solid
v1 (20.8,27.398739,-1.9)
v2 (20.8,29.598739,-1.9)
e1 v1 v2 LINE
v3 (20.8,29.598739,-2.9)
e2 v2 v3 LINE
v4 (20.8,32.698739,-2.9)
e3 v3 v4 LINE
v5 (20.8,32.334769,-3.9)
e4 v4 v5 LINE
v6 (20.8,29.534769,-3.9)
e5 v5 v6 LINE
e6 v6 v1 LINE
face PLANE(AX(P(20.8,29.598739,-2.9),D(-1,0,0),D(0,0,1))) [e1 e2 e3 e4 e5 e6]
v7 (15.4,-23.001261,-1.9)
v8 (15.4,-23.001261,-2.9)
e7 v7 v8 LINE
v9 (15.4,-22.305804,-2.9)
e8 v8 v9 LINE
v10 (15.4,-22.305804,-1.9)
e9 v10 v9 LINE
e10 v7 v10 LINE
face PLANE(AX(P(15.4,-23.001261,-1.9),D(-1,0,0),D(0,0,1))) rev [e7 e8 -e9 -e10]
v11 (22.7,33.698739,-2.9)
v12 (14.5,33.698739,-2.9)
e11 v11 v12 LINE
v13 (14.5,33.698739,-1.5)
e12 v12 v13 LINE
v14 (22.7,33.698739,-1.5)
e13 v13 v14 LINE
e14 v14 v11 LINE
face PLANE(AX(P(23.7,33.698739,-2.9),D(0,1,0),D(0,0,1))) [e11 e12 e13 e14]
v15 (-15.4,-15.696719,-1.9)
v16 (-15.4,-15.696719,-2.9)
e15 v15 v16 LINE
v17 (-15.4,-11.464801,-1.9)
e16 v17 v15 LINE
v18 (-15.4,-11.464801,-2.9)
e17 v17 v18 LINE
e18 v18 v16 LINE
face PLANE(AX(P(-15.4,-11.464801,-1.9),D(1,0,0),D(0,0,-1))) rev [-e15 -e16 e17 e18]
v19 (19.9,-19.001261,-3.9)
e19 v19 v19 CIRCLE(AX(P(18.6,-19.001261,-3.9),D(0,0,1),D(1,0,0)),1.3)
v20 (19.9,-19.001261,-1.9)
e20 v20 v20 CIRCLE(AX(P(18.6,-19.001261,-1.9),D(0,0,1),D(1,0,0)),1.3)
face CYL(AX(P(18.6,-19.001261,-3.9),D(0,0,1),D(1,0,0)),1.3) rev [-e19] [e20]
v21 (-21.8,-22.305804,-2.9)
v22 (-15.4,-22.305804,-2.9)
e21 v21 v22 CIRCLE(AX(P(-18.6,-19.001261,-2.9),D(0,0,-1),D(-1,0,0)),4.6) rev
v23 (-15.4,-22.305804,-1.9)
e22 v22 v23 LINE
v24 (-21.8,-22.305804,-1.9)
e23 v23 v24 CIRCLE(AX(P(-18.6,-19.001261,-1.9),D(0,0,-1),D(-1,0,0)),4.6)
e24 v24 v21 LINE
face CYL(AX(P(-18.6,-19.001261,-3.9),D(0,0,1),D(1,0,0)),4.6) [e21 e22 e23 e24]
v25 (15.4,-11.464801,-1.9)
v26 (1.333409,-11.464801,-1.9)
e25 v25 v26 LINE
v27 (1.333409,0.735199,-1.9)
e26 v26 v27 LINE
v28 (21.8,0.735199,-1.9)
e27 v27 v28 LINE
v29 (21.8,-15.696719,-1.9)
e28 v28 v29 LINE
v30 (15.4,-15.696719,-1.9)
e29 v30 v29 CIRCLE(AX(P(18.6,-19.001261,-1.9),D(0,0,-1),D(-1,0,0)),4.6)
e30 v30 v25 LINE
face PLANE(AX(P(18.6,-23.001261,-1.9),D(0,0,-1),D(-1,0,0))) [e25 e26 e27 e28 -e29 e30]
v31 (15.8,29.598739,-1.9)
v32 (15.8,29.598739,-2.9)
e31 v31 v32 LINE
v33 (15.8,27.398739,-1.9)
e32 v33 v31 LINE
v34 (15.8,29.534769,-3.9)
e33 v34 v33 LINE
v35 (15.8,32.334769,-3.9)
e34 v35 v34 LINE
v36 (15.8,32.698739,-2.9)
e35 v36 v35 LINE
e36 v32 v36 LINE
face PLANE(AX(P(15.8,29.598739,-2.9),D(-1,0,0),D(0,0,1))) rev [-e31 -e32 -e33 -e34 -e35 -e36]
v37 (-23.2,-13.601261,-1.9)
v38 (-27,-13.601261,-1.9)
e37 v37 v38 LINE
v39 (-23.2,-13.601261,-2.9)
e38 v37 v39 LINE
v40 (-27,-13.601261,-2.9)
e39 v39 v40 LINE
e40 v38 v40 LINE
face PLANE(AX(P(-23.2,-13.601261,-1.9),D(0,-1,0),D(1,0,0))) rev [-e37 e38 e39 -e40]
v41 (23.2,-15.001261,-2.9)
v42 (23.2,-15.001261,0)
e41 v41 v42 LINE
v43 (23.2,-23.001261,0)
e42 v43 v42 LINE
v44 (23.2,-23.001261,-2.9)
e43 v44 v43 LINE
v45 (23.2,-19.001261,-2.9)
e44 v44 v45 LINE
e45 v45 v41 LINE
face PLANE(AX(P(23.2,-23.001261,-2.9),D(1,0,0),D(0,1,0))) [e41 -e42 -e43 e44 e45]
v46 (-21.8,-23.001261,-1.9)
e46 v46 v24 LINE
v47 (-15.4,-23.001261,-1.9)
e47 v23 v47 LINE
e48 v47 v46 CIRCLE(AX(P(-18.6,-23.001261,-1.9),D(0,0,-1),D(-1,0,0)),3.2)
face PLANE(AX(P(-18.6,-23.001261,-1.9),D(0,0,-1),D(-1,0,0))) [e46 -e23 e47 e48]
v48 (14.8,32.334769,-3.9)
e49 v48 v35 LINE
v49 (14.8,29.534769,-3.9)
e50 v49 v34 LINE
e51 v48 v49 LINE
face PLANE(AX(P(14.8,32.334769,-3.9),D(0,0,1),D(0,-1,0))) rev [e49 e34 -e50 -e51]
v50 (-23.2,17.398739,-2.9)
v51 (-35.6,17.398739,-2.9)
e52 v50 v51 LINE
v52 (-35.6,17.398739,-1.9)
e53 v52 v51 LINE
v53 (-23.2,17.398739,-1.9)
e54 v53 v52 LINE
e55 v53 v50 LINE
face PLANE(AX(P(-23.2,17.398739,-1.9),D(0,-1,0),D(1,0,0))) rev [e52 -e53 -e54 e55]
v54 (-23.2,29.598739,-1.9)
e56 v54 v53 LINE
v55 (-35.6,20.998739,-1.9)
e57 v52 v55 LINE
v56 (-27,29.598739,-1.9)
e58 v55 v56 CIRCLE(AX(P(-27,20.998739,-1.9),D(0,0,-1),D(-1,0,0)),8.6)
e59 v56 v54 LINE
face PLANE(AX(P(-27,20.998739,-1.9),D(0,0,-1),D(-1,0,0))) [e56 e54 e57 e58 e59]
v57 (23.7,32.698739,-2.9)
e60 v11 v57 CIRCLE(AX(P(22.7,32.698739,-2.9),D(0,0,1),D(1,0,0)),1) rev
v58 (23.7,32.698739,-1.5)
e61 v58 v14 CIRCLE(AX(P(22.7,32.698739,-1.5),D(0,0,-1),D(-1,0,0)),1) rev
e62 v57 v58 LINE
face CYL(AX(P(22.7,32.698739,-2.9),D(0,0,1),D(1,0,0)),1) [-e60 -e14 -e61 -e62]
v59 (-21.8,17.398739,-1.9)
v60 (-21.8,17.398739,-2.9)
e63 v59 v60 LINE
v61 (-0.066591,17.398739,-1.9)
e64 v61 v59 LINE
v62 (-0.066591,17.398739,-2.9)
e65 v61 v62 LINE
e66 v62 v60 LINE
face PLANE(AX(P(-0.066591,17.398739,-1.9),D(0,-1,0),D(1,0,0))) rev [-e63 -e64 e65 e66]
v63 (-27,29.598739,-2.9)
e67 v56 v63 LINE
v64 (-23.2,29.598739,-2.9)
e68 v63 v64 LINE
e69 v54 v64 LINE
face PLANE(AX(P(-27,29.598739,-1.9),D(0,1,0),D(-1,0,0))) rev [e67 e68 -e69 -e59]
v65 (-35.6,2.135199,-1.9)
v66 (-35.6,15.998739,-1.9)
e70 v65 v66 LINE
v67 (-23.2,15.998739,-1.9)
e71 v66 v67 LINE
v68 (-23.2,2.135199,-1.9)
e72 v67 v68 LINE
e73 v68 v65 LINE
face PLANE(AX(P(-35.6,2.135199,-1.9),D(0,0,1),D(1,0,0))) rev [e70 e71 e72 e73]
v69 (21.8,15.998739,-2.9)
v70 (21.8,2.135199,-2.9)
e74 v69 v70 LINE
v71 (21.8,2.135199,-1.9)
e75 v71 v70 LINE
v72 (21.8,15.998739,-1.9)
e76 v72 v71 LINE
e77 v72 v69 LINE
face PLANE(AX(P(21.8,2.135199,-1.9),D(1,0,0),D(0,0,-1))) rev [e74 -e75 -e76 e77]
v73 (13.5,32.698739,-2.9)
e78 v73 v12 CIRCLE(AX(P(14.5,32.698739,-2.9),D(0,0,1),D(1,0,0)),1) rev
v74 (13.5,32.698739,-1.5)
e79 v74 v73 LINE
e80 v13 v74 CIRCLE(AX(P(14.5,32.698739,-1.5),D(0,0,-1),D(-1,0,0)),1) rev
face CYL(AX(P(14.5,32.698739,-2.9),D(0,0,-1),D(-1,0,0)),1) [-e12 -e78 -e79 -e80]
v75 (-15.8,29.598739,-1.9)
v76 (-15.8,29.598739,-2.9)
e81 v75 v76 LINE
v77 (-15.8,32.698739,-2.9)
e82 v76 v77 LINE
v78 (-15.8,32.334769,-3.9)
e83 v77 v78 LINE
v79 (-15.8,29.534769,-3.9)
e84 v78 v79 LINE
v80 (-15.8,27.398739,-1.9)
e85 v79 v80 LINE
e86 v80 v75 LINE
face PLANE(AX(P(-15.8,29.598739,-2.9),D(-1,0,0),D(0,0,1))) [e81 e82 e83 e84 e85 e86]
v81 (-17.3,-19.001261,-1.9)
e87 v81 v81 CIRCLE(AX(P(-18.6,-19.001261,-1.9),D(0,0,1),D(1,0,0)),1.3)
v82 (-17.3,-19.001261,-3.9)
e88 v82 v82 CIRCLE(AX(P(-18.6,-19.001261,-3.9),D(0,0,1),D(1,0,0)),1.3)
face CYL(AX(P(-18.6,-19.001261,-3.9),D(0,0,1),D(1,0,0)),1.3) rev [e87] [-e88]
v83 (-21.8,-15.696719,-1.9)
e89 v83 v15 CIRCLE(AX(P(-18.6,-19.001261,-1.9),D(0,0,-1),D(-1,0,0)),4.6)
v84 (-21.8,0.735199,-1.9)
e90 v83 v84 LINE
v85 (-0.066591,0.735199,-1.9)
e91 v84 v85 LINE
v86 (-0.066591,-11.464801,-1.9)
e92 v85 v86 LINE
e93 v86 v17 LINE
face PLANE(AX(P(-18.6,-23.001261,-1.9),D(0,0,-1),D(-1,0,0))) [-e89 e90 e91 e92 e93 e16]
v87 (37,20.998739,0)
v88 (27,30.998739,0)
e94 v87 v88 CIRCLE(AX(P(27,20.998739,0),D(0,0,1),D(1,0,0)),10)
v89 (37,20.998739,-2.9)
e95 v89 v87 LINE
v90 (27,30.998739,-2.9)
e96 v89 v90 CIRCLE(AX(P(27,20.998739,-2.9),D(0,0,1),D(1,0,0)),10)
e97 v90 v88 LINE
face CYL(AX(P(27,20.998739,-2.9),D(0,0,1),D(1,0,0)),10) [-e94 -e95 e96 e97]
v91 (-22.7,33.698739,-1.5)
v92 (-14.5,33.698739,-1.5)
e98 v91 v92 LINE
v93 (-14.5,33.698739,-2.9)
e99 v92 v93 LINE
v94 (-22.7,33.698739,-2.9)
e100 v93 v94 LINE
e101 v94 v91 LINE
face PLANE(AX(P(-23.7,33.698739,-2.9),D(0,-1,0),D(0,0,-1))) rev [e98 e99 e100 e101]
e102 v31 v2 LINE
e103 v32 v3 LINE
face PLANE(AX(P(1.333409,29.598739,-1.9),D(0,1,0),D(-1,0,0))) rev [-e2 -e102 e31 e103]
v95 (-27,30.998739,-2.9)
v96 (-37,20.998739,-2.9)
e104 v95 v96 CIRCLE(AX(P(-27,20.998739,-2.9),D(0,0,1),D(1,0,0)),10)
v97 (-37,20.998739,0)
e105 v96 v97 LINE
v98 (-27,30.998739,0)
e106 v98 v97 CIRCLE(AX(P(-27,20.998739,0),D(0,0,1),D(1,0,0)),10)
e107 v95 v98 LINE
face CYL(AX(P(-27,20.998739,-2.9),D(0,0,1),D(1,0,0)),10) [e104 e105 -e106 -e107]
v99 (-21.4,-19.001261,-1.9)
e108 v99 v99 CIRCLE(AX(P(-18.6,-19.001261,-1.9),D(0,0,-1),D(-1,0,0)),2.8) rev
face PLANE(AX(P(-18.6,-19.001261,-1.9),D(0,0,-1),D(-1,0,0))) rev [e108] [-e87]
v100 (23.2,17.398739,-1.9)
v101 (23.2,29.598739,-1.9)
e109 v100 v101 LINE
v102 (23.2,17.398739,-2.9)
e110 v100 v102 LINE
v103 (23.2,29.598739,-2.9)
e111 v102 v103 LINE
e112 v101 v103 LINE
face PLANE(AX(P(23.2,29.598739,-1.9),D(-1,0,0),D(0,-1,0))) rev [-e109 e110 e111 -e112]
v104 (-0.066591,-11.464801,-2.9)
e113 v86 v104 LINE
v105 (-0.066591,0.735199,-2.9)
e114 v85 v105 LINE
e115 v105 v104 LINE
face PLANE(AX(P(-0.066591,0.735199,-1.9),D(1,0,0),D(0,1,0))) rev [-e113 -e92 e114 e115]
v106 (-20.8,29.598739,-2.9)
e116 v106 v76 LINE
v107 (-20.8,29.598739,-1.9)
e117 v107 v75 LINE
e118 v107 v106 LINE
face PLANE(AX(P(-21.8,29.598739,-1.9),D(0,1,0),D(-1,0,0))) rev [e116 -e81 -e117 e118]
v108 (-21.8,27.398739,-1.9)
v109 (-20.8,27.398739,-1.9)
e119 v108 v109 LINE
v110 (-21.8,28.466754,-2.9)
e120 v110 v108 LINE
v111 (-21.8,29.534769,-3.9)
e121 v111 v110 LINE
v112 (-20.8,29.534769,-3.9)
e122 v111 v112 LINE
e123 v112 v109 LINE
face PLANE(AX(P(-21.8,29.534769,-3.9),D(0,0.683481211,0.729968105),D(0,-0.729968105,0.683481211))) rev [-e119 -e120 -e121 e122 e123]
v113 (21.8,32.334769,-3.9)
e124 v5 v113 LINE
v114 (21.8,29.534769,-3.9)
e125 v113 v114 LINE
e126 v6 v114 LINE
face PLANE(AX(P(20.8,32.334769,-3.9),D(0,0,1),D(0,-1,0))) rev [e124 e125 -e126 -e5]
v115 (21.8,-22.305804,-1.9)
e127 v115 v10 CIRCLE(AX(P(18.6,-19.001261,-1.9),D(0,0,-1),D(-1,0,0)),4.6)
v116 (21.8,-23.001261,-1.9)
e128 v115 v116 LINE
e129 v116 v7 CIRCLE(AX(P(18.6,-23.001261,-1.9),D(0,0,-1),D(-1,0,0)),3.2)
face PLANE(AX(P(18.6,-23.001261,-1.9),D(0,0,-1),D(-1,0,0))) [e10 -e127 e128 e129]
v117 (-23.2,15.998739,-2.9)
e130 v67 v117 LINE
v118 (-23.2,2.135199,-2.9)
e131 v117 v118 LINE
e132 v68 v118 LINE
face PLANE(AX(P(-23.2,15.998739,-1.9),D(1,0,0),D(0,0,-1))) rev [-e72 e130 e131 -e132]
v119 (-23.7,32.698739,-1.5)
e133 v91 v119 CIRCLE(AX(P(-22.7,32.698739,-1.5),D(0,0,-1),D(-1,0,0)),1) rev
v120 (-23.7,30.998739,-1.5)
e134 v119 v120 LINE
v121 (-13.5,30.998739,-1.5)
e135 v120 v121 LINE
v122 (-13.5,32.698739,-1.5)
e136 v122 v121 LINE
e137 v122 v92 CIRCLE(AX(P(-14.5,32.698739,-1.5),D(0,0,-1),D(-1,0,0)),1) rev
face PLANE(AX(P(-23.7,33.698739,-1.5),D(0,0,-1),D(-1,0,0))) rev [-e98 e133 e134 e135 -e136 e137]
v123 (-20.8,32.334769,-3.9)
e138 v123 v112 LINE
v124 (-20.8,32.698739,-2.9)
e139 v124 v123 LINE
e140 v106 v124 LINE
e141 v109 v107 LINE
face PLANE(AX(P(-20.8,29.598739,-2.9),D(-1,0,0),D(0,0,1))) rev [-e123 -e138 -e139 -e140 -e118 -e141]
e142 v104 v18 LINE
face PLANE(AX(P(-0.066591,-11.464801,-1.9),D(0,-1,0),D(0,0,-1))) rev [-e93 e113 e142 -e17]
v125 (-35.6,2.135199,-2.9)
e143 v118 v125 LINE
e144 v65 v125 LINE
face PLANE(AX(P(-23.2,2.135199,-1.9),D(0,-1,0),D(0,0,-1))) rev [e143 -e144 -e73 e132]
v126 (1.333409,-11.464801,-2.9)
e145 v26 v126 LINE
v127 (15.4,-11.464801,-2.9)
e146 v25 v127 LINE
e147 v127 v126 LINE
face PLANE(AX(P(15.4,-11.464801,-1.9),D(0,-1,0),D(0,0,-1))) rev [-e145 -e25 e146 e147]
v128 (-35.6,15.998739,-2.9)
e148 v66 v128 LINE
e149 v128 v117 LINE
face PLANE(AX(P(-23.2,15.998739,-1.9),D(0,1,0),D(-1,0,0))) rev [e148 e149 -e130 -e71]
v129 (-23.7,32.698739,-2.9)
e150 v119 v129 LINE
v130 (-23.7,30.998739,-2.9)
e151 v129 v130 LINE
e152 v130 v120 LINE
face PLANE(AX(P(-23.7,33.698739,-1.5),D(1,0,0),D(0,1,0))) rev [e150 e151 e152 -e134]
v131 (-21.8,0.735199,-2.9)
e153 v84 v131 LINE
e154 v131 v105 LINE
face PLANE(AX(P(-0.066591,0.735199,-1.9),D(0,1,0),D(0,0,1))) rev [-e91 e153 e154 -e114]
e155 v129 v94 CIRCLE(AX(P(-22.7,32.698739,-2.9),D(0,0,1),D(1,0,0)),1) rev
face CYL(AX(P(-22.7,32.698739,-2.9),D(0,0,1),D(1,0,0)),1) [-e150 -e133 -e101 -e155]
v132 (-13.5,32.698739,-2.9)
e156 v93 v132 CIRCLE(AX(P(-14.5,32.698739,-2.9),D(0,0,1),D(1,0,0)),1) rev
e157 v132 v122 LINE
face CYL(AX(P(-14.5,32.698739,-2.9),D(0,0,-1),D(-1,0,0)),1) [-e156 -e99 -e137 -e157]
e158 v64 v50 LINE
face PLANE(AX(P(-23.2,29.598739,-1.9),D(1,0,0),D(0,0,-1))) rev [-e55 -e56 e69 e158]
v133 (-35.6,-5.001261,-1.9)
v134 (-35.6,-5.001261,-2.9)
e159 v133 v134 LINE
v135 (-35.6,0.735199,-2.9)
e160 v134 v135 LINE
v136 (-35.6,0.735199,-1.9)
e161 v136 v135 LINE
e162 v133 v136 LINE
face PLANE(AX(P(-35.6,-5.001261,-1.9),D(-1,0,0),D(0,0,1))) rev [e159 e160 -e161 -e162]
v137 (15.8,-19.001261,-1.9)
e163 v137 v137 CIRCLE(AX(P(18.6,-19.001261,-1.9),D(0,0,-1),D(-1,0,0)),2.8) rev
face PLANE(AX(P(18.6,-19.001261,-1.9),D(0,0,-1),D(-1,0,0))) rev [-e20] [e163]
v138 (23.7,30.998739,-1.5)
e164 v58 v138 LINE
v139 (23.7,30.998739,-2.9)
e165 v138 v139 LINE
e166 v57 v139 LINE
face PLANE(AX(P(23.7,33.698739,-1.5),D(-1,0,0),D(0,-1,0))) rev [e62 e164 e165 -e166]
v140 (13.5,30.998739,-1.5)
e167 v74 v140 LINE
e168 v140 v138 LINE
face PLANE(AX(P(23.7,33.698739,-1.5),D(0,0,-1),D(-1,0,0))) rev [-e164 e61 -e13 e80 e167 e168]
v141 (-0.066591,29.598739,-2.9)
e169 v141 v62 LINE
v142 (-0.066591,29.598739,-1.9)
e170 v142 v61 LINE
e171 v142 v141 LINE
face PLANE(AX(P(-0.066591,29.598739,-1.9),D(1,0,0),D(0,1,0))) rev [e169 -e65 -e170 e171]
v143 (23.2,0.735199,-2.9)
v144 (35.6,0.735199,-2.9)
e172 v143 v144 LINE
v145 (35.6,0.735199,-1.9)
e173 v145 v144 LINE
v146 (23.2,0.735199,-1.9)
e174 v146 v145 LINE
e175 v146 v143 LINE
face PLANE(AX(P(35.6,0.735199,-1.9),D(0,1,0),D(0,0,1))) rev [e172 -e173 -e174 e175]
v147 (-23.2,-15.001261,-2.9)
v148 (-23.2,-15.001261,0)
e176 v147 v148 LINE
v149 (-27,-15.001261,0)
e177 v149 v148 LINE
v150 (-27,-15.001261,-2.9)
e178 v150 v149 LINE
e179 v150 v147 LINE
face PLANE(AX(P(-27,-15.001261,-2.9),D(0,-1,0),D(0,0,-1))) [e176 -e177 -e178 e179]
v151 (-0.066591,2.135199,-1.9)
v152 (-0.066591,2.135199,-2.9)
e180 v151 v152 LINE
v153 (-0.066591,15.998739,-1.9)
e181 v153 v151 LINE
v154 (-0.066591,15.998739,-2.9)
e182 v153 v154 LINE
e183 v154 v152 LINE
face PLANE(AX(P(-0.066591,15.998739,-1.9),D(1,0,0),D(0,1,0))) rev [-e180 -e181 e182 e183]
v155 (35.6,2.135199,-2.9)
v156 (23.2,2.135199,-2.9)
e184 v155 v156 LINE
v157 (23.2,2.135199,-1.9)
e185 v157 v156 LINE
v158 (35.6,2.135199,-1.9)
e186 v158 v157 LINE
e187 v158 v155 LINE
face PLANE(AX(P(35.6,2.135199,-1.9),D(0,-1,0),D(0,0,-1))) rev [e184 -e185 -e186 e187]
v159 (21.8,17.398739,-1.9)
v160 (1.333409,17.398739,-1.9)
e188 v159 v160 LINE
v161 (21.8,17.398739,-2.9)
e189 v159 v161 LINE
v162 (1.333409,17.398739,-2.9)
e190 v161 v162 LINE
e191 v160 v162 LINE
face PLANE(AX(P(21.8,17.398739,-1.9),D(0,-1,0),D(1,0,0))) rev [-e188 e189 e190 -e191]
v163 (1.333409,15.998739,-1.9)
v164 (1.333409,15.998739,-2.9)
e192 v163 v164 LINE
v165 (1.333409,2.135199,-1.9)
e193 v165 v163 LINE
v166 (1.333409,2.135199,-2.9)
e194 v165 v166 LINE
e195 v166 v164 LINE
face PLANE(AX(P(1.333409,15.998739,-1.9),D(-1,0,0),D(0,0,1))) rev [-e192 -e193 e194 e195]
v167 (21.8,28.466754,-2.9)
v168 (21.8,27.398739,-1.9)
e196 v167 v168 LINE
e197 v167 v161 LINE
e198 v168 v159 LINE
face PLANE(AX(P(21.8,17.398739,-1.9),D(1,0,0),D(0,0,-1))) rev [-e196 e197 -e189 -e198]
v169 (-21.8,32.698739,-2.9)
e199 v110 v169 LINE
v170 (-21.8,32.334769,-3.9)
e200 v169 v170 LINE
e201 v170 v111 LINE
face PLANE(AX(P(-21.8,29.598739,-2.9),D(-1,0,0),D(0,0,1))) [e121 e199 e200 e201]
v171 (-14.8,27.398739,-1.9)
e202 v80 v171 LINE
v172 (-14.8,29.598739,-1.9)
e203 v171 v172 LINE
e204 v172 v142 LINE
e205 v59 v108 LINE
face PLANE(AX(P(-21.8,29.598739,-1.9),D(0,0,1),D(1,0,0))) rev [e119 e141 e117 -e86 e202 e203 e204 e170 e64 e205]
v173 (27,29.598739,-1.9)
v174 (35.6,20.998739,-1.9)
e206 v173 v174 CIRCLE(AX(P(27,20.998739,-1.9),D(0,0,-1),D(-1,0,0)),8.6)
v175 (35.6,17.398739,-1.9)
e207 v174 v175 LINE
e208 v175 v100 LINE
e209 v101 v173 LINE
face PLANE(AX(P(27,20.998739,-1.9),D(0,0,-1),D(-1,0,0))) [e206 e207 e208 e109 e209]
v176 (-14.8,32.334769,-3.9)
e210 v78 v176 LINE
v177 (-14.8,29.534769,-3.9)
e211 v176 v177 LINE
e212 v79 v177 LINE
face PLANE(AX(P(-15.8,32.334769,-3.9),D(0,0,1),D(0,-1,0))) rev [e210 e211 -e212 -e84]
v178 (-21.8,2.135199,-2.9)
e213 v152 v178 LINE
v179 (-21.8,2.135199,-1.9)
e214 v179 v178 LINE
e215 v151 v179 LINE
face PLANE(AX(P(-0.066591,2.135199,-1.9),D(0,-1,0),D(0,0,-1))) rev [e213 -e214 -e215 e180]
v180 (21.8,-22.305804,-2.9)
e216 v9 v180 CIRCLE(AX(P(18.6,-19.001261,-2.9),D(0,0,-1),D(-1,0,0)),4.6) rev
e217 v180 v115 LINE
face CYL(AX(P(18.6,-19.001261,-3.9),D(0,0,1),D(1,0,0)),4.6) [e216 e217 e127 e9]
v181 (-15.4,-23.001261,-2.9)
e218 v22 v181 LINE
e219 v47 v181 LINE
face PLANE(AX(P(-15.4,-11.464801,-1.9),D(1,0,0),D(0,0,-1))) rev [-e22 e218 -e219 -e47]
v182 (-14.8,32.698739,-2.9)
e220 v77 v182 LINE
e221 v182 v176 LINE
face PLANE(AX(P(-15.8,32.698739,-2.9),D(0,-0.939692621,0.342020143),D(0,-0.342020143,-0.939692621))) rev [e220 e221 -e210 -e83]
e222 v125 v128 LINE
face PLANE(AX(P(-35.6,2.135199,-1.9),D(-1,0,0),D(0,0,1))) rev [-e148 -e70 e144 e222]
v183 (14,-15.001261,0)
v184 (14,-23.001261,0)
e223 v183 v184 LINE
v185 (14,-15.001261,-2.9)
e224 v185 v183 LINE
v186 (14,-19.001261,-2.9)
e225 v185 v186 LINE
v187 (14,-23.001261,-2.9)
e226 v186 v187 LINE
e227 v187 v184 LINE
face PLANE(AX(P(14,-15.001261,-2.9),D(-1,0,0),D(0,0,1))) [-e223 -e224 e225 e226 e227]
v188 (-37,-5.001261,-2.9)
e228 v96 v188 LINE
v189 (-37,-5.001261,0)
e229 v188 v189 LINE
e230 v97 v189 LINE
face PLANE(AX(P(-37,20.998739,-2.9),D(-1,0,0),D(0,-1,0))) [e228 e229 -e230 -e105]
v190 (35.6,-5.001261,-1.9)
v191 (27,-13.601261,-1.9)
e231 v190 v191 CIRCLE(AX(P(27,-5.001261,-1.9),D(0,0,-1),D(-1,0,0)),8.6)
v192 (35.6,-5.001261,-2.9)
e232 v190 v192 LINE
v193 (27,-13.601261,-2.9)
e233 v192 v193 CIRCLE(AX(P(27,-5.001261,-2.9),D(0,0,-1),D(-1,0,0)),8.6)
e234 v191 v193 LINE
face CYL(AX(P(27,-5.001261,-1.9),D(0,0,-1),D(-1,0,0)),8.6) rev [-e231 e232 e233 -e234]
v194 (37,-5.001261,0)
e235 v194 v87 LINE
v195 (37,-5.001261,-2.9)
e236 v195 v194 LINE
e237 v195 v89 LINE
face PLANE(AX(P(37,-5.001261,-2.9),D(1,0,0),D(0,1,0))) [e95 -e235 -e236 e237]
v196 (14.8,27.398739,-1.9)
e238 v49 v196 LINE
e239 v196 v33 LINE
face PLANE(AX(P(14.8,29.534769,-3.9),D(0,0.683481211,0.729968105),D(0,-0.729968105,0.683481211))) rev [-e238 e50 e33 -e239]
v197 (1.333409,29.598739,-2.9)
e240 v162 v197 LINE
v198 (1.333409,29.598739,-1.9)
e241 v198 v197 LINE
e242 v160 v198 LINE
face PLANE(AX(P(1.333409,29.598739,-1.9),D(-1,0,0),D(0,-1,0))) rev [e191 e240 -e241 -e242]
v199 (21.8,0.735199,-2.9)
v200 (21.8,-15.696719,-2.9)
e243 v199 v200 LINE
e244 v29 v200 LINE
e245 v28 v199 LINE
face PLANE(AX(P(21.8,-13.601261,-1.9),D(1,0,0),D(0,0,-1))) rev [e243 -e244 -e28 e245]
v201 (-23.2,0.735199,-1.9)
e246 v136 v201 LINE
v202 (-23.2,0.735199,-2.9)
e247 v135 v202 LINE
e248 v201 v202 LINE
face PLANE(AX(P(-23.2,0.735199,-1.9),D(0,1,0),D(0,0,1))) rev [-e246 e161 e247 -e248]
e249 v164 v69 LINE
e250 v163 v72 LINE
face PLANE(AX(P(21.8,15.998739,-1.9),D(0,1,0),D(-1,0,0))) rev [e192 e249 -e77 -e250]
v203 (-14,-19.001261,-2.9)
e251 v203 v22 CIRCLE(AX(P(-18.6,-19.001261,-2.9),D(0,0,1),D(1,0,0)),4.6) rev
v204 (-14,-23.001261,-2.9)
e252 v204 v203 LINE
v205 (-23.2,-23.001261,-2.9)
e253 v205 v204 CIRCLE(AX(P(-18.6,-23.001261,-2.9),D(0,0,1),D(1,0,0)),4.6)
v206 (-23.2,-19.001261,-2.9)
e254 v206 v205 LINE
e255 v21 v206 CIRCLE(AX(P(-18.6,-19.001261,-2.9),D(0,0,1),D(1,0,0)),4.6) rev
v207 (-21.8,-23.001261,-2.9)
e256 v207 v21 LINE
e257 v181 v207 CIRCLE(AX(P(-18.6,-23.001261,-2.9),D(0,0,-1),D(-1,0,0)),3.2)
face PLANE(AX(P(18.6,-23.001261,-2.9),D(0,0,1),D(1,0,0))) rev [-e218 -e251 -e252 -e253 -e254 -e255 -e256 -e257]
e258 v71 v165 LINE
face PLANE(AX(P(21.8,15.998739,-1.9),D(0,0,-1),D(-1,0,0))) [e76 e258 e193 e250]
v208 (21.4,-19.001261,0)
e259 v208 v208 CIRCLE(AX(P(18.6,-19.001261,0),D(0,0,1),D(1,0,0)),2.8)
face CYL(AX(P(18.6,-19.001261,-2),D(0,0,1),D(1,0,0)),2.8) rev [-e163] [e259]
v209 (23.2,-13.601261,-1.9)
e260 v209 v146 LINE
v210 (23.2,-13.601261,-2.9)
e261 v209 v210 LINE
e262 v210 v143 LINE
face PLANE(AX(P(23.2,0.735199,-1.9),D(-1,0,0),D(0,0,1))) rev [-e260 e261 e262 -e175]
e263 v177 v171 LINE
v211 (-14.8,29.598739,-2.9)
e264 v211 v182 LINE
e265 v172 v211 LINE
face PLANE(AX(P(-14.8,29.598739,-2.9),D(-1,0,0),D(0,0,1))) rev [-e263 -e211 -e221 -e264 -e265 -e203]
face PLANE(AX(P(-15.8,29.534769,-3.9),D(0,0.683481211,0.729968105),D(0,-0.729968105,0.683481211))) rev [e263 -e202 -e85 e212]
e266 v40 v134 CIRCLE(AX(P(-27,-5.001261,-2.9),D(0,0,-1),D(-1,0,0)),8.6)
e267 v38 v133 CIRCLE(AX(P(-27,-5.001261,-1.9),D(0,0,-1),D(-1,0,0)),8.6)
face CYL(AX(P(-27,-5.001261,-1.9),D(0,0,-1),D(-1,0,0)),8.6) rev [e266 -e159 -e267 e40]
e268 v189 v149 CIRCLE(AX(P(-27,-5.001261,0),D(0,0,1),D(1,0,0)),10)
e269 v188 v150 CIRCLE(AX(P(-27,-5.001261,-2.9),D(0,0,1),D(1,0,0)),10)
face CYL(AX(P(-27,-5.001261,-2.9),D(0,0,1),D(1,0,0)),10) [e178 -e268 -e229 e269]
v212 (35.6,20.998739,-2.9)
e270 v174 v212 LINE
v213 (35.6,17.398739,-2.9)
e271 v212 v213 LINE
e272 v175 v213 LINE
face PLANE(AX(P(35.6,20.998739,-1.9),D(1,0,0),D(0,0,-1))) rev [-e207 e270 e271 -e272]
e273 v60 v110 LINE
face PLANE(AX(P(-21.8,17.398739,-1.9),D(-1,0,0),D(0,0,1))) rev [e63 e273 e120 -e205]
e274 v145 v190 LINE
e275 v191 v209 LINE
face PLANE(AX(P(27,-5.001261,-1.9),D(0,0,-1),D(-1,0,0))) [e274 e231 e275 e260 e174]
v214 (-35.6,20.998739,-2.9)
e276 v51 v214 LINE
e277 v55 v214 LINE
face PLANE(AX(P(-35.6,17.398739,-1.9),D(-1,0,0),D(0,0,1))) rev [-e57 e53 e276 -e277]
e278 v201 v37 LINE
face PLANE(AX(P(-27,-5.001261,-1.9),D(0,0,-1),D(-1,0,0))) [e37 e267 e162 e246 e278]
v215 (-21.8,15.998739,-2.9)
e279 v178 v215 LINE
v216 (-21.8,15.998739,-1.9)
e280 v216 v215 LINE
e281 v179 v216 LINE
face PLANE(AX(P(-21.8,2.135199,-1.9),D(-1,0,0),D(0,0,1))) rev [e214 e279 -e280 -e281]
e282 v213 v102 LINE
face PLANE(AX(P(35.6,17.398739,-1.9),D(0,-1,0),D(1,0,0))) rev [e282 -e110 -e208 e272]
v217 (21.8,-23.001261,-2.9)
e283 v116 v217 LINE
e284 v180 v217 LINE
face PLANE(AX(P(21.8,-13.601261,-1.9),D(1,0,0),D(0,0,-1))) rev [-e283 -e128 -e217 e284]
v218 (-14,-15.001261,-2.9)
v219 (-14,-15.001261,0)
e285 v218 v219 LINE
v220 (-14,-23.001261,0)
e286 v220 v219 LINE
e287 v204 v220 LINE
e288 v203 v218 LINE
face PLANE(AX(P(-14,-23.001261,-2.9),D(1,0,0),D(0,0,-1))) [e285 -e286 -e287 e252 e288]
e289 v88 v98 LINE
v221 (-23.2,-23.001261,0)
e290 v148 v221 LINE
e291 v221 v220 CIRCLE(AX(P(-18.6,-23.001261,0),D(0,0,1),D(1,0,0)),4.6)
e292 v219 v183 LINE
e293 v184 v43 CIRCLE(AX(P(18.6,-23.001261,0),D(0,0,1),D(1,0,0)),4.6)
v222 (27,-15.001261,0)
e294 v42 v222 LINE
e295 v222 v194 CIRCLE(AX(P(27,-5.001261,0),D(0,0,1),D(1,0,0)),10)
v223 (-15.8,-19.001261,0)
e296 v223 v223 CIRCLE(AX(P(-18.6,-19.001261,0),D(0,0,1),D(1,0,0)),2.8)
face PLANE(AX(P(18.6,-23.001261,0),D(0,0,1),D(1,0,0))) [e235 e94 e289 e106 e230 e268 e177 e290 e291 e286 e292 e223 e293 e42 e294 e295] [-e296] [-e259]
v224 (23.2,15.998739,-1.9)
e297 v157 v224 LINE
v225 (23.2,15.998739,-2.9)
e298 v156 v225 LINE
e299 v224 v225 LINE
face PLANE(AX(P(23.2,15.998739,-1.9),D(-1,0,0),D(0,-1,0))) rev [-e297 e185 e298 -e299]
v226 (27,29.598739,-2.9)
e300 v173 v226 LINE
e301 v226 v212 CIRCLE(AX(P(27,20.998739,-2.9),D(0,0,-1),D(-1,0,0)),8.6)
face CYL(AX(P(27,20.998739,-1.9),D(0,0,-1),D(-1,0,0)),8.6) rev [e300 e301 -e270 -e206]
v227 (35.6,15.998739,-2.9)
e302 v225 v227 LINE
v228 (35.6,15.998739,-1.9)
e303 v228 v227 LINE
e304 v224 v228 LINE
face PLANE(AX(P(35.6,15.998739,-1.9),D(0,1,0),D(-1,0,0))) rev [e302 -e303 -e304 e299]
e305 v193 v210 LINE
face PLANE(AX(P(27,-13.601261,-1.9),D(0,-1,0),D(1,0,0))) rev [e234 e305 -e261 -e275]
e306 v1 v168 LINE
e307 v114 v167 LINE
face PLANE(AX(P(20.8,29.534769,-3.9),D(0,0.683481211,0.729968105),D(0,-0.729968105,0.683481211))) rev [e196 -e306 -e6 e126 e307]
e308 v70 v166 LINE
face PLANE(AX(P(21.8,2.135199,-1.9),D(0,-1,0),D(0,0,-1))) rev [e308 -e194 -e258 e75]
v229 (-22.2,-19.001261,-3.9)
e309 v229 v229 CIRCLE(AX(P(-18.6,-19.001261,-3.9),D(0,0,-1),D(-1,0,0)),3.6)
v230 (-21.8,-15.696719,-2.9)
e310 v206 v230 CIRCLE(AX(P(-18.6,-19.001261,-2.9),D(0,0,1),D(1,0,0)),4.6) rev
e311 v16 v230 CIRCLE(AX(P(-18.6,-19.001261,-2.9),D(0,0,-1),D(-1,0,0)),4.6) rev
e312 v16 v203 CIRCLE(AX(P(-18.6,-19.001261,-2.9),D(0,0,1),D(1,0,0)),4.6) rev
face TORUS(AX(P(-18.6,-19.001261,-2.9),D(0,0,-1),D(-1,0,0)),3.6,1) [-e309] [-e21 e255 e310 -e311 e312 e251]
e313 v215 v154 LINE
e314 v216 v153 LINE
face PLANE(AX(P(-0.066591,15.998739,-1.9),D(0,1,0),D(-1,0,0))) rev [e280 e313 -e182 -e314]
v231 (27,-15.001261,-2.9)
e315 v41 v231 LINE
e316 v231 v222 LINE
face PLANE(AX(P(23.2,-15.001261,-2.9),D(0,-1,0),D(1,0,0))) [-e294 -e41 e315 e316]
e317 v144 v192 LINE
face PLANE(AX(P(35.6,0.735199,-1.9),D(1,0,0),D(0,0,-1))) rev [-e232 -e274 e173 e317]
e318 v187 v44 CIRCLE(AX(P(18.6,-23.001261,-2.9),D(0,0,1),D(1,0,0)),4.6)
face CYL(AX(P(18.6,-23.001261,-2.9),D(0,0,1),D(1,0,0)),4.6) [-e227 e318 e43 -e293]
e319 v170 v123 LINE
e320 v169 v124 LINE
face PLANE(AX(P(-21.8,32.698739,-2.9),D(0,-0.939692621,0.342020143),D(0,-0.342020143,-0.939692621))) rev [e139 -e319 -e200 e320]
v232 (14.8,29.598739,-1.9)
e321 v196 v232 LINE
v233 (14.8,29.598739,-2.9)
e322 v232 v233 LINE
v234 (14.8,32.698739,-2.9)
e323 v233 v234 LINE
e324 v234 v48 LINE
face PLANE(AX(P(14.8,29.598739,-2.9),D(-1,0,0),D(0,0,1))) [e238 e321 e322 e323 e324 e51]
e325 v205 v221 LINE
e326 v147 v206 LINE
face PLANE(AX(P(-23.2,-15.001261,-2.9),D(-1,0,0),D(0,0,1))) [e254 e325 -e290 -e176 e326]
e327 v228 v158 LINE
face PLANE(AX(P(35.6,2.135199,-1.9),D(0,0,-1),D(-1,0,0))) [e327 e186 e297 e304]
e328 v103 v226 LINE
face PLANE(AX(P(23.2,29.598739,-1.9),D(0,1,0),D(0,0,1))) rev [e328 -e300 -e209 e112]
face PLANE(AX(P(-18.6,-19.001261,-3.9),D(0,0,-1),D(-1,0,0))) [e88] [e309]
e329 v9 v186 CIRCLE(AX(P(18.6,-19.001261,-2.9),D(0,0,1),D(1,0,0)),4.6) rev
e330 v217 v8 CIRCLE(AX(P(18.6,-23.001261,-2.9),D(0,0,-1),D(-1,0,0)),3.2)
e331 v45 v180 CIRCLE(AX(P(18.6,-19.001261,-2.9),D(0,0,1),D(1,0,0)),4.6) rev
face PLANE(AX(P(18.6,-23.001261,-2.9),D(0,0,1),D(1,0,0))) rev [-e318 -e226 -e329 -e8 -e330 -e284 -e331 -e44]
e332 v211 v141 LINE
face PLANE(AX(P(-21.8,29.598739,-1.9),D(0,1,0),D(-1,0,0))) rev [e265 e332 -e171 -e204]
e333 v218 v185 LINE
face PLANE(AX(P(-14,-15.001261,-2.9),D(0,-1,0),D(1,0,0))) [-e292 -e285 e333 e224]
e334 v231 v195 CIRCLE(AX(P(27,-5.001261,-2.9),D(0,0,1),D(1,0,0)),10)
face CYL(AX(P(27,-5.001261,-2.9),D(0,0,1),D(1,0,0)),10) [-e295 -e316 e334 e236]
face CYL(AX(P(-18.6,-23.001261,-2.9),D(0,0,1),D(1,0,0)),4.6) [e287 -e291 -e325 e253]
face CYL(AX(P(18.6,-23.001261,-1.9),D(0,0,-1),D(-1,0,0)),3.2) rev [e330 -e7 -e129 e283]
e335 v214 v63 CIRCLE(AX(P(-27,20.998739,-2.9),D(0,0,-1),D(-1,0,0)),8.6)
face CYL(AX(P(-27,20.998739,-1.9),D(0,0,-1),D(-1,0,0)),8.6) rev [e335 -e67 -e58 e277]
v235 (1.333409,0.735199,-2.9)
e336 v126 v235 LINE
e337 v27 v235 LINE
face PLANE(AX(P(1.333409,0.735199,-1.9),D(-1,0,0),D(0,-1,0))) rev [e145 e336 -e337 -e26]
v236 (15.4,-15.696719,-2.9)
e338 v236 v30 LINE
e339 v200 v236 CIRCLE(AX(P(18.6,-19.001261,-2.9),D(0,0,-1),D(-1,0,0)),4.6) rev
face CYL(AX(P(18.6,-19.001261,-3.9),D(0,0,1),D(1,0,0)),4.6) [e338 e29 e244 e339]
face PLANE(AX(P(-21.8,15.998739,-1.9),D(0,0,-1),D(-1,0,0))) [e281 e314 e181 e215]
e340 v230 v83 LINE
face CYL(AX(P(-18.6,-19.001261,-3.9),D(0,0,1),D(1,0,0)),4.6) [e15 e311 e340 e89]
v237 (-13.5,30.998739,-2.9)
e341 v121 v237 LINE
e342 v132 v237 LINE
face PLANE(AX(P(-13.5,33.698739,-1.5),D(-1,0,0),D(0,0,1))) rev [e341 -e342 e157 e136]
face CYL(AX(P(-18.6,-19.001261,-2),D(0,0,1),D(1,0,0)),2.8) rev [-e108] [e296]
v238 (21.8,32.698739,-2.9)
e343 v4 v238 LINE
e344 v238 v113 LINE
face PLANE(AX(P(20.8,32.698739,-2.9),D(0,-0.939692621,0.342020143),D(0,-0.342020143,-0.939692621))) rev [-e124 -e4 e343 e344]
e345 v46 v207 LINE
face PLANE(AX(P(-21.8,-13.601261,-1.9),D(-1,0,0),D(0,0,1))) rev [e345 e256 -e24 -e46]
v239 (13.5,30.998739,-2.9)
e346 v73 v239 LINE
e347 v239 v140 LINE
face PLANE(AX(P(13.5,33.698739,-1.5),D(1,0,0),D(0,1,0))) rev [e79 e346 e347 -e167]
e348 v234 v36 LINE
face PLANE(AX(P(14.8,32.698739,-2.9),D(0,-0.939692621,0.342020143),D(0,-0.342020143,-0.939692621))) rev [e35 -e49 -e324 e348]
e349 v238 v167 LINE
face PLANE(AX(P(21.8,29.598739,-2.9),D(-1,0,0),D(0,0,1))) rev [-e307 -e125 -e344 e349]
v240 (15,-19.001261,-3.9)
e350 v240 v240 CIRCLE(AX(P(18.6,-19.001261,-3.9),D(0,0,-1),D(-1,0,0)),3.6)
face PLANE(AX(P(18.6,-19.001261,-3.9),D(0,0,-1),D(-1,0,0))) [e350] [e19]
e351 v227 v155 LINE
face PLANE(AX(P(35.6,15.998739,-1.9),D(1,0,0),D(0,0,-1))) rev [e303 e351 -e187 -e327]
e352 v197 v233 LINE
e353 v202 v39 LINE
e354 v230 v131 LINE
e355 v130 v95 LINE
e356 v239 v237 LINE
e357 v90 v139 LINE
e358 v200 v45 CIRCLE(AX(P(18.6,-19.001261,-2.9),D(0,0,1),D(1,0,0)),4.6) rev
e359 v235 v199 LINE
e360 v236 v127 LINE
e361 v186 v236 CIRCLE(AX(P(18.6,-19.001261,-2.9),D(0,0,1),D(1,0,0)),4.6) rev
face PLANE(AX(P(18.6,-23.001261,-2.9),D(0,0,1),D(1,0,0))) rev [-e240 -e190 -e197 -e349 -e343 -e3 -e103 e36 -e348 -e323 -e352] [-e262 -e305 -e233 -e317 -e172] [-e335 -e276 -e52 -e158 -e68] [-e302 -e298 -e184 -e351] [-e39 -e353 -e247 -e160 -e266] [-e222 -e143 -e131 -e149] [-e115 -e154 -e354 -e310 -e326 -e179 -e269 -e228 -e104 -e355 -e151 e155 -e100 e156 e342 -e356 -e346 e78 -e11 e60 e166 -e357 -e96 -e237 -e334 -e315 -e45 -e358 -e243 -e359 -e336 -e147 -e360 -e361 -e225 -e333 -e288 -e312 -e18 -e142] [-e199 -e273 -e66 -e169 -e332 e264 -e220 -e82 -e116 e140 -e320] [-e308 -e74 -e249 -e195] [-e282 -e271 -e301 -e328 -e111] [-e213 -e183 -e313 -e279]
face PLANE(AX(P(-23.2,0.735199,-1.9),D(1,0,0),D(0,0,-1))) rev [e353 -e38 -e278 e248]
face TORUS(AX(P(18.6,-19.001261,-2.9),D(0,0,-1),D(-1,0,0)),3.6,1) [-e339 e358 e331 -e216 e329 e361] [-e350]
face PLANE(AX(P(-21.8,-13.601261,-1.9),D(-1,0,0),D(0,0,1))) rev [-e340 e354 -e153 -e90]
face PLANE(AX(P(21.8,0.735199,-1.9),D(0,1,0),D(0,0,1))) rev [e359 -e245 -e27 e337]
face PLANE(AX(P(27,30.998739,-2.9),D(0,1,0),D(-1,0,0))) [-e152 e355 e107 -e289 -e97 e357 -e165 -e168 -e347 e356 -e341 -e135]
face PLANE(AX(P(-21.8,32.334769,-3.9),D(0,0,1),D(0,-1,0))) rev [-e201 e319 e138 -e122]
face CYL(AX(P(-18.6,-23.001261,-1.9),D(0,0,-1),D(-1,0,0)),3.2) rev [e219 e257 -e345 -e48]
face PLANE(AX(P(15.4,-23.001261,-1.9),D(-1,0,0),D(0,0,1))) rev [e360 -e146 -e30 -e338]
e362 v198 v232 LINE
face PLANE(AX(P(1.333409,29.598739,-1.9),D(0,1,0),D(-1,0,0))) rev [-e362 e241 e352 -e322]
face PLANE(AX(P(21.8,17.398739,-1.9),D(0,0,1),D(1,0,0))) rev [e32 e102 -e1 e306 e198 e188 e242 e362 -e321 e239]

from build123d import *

# Parameters (mm, degrees)
EXTRUSION1_DEPTH                  = 2.9
ESQUISSE2_W                       = 10.2
ESQUISSE2_H                       = 1.4
EXTRUSION2_DEPTH                  = 2.7
CONG_1_R                          = 1
ESQUISSE3_W                       = 20.466591469
ESQUISSE3_H                       = 12.2
ESQUISSE3_W_2                     = 21.733408531
ESQUISSE3_W_3                     = 12.4
ESQUISSE3_H_2                     = 13.863540316
ENL_V_MAT_EXTRU_1_DEPTH           = 1
ESQUISSE4_R                       = 2.8
ENL_V_MAT_EXTRU_2_DEPTH           = 2
EXTRUSION3_DEPTH                  = 1
EXTRUSION3_DEPTH_BACK             = 1
ESQUISSE5_R                       = 4.6
CONG_2_R                          = 1
ESQUISSE6_R                       = 1.3
ENL_V_MAT_EXTRU_4_DEPTH           = 51.085976067
EXTRUSION4_DEPTH                  = 1
R_P_TITION_LIN_AIRE1_COUNT        = 2
R_P_TITION_LIN_AIRE1_PITCH        = 6
R_P_TITION_LIN_AIRE2_COUNT        = 2
R_P_TITION_LIN_AIRE2_PITCH        = 36.6
R_P_TITION_LIN_AIRE2_COPY_1_DEPTH = 1


with BuildPart() as part:
    # Esquisse1 → Extrusion1 (new body)
    with BuildSketch(Plane.XY):
        with BuildLine():
            Line((23.2, -23.001261172), (23.2, -15.001261172))
            Line((23.2, -15.001261172), (27, -15.001261172))
            ThreePointArc((27, -15.001261172), (34.071067812, -12.072328984), (37, -5.001261172))
            Line((37, -5.001261172), (37, 20.998738828))
            ThreePointArc((37, 20.998738828), (34.071067812, 28.069806639), (27, 30.998738828))
            Line((27, 30.998738828), (-27, 30.998738828))
            ThreePointArc((-27, 30.998738828), (-34.071067812, 28.069806639), (-37, 20.998738828))
            Line((-37, 20.998738828), (-37, -5.001261172))
            ThreePointArc((-37, -5.001261172), (-34.071067812, -12.072328984), (-27, -15.001261172))
            Line((-27, -15.001261172), (-23.2, -15.001261172))
            Line((-23.2, -15.001261172), (-23.2, -23.001261172))
            ThreePointArc((-23.2, -23.001261172), (-18.6, -27.601261172), (-14, -23.001261172))
            Line((-14, -23.001261172), (-14, -15.001261172))
            Line((-14, -15.001261172), (14, -15.001261172))
            Line((14, -15.001261172), (14, -23.001261172))
            ThreePointArc((14, -23.001261172), (18.6, -27.601261172), (23.2, -23.001261172))
        make_face()
    extrude(amount=-EXTRUSION1_DEPTH)

    # Esquisse2 → Extrusion2 (add)
    with BuildSketch(Plane(origin=(0, 30.998738828, 0), x_dir=(-1, 0, 0), z_dir=(0, 1, 0))):
        with Locations((-18.6, -2.2)):
            Rectangle(ESQUISSE2_W, ESQUISSE2_H)
        with Locations((18.6, -2.2)):
            Rectangle(ESQUISSE2_W, ESQUISSE2_H)
    extrude(amount=EXTRUSION2_DEPTH)

    # Congé1
    cong_1_edges = [part.edges().sort_by_distance(p)[0] for p in [
        (23.7, 33.698738828, -2.2),
        (13.5, 33.698738828, -2.2),
        (-23.7, 33.698738828, -2.2),
        (-13.5, 33.698738828, -2.2),
    ]]
    fillet(cong_1_edges, radius=CONG_1_R)

    # Esquisse3 → Enlèv. mat.-Extru.1 (cut)
    with BuildSketch(Plane(origin=(0, 0, -2.9), x_dir=(-1, 0, 0), z_dir=(0, 0, -1))):
        with BuildLine():
            Line((35.6, -5.001261172), (35.6, 0.735198512))
            Line((35.6, 0.735198512), (23.2, 0.735198512))
            Line((23.2, 0.735198512), (23.2, -13.601261172))
            Line((23.2, -13.601261172), (27, -13.601261172))
            ThreePointArc((27, -13.601261172), (33.081118318, -11.082379491), (35.6, -5.001261172))
        make_face()
        with BuildLine():
            Line((21.8, -23.001261172), (21.8, -13.601261172))
            Line((21.8, -13.601261172), (21.8, 0.735198512))
            Line((21.8, 0.735198512), (0.066591469, 0.735198512))
            Line((0.066591469, 0.735198512), (0.066591469, -11.464801488))
            Line((0.066591469, -11.464801488), (15.4, -11.464801488))
            Line((15.4, -11.464801488), (15.4, -23.001261172))
            ThreePointArc((15.4, -23.001261172), (18.6, -26.201261172), (21.8, -23.001261172))
        make_face()
        with BuildLine():
            Line((-15.4, -11.464801488), (-1.333408531, -11.464801488))
            Line((-1.333408531, -11.464801488), (-1.333408531, 0.735198512))
            Line((-1.333408531, 0.735198512), (-21.8, 0.735198512))
            Line((-21.8, 0.735198512), (-21.8, -13.601261172))
            Line((-21.8, -13.601261172), (-21.8, -23.001261172))
            ThreePointArc((-21.8, -23.001261172), (-18.6, -26.201261172), (-15.4, -23.001261172))
            Line((-15.4, -23.001261172), (-15.4, -11.464801488))
        make_face()
        with BuildLine():
            Line((-27, -13.601261172), (-23.2, -13.601261172))
            Line((-23.2, -13.601261172), (-23.2, 0.735198512))
            Line((-23.2, 0.735198512), (-35.6, 0.735198512))
            Line((-35.6, 0.735198512), (-35.6, -5.001261172))
            ThreePointArc((-35.6, -5.001261172), (-33.081118318, -11.082379491), (-27, -13.601261172))
        make_face()
        with BuildLine():
            Line((-35.6, 20.998738828), (-35.6, 17.398738828))
            Line((-35.6, 17.398738828), (-23.2, 17.398738828))
            Line((-23.2, 17.398738828), (-23.2, 29.598738828))
            Line((-23.2, 29.598738828), (-27, 29.598738828))
            ThreePointArc((-27, 29.598738828), (-33.081118318, 27.079857146), (-35.6, 20.998738828))
        make_face()
        with BuildLine():
            Line((27, 29.598738828), (23.2, 29.598738828))
            Line((23.2, 29.598738828), (23.2, 17.398738828))
            Line((23.2, 17.398738828), (35.6, 17.398738828))
            Line((35.6, 17.398738828), (35.6, 20.998738828))
            ThreePointArc((35.6, 20.998738828), (33.081118318, 27.079857146), (27, 29.598738828))
        make_face()
        with Locations((-11.566704266, 23.498738828)):
            Rectangle(ESQUISSE3_W, ESQUISSE3_H)
        with Locations((10.933295734, 23.498738828)):
            Rectangle(ESQUISSE3_W_2, ESQUISSE3_H)
        with Locations((-29.4, 9.06696867)):
            Rectangle(ESQUISSE3_W_3, ESQUISSE3_H_2)
        with Locations((-11.566704266, 9.06696867)):
            Rectangle(ESQUISSE3_W, ESQUISSE3_H_2)
        with Locations((10.933295734, 9.06696867)):
            Rectangle(ESQUISSE3_W_2, ESQUISSE3_H_2)
        with Locations((29.4, 9.06696867)):
            Rectangle(ESQUISSE3_W_3, ESQUISSE3_H_2)
    extrude(amount=-ENL_V_MAT_EXTRU_1_DEPTH, mode=Mode.SUBTRACT)

    # Esquisse4 → Enlèv. mat.-Extru.2 (cut)
    with BuildSketch(Plane.XY):
        with Locations((-18.6, -19.001261172)):
            Circle(ESQUISSE4_R)
        with Locations((18.6, -19.001261172)):
            Circle(ESQUISSE4_R)
    extrude(amount=-ENL_V_MAT_EXTRU_2_DEPTH, mode=Mode.SUBTRACT)

    # Esquisse5 → Extrusion3 (add, two sides: drawn at the far end of the back side and taken through both)
    with BuildSketch(Plane(origin=(0, 0, -2.9), x_dir=(-1, 0, 0), z_dir=(0, 0, -1)).offset(-EXTRUSION3_DEPTH_BACK)):
        with Locations((-18.6, -19.001261172)):
            Circle(ESQUISSE5_R)
        with Locations((18.6, -19.001261172)):
            Circle(ESQUISSE5_R)
    extrude(amount=EXTRUSION3_DEPTH + EXTRUSION3_DEPTH_BACK)

    # Congé2
    cong_2_edges = [part.edges().sort_by_distance(p)[0] for p in [
        (23.2, -19.001261172, -3.9),
        (-14, -19.001261172, -3.9),
    ]]
    fillet(cong_2_edges, radius=CONG_2_R - 0.0001)  # a hair under: the kernel refuses the full size

    # Esquisse6 → Enlèv. mat.-Extru.4 (cut, through all)
    with BuildSketch(Plane.XY.offset(-1.9)):
        with Locations((18.6, -19.001261172)):
            Circle(ESQUISSE6_R)
        with Locations((-18.6, -19.001261172)):
            Circle(ESQUISSE6_R)
    extrude(amount=-ENL_V_MAT_EXTRU_4_DEPTH, mode=Mode.SUBTRACT)

    # Esquisse7 → Extrusion4 (add)
    with BuildSketch(Plane.ZY.offset(-21.8)):
        Polygon((-2.9, 32.698738828), (-3.9, 32.334768593), (-3.9, 29.534768593), (-1.9, 27.398738828), (-1.9, 29.598738828), (-2.9, 29.598738828), align=None)
    extrusion4 = extrude(amount=EXTRUSION4_DEPTH)

    # Répétition linéaire1: Extrusion4 ×2
    with Locations(*[(-i * R_P_TITION_LIN_AIRE1_PITCH, 0, 0) for i in range(1, R_P_TITION_LIN_AIRE1_COUNT)]):
        add(extrusion4)

    # Répétition linéaire2: Extrusion4 ×2
    with Locations(*[(-i * R_P_TITION_LIN_AIRE2_PITCH, 0, 0) for i in range(1, R_P_TITION_LIN_AIRE2_COUNT)]):
        add(extrusion4)

    # Répétition linéaire2 copy 1 sketch → Répétition linéaire2 copy 1 (add)
    with BuildSketch(Plane.ZY.offset(20.8)):
        Polygon((-2.9, 32.698738828), (-3.9, 32.334768593), (-3.9, 29.534768593), (-1.9, 27.398738828), (-1.9, 29.598738828), (-2.9, 29.598738828), align=None)
    extrude(amount=R_P_TITION_LIN_AIRE2_COPY_1_DEPTH)


solid = part.part
